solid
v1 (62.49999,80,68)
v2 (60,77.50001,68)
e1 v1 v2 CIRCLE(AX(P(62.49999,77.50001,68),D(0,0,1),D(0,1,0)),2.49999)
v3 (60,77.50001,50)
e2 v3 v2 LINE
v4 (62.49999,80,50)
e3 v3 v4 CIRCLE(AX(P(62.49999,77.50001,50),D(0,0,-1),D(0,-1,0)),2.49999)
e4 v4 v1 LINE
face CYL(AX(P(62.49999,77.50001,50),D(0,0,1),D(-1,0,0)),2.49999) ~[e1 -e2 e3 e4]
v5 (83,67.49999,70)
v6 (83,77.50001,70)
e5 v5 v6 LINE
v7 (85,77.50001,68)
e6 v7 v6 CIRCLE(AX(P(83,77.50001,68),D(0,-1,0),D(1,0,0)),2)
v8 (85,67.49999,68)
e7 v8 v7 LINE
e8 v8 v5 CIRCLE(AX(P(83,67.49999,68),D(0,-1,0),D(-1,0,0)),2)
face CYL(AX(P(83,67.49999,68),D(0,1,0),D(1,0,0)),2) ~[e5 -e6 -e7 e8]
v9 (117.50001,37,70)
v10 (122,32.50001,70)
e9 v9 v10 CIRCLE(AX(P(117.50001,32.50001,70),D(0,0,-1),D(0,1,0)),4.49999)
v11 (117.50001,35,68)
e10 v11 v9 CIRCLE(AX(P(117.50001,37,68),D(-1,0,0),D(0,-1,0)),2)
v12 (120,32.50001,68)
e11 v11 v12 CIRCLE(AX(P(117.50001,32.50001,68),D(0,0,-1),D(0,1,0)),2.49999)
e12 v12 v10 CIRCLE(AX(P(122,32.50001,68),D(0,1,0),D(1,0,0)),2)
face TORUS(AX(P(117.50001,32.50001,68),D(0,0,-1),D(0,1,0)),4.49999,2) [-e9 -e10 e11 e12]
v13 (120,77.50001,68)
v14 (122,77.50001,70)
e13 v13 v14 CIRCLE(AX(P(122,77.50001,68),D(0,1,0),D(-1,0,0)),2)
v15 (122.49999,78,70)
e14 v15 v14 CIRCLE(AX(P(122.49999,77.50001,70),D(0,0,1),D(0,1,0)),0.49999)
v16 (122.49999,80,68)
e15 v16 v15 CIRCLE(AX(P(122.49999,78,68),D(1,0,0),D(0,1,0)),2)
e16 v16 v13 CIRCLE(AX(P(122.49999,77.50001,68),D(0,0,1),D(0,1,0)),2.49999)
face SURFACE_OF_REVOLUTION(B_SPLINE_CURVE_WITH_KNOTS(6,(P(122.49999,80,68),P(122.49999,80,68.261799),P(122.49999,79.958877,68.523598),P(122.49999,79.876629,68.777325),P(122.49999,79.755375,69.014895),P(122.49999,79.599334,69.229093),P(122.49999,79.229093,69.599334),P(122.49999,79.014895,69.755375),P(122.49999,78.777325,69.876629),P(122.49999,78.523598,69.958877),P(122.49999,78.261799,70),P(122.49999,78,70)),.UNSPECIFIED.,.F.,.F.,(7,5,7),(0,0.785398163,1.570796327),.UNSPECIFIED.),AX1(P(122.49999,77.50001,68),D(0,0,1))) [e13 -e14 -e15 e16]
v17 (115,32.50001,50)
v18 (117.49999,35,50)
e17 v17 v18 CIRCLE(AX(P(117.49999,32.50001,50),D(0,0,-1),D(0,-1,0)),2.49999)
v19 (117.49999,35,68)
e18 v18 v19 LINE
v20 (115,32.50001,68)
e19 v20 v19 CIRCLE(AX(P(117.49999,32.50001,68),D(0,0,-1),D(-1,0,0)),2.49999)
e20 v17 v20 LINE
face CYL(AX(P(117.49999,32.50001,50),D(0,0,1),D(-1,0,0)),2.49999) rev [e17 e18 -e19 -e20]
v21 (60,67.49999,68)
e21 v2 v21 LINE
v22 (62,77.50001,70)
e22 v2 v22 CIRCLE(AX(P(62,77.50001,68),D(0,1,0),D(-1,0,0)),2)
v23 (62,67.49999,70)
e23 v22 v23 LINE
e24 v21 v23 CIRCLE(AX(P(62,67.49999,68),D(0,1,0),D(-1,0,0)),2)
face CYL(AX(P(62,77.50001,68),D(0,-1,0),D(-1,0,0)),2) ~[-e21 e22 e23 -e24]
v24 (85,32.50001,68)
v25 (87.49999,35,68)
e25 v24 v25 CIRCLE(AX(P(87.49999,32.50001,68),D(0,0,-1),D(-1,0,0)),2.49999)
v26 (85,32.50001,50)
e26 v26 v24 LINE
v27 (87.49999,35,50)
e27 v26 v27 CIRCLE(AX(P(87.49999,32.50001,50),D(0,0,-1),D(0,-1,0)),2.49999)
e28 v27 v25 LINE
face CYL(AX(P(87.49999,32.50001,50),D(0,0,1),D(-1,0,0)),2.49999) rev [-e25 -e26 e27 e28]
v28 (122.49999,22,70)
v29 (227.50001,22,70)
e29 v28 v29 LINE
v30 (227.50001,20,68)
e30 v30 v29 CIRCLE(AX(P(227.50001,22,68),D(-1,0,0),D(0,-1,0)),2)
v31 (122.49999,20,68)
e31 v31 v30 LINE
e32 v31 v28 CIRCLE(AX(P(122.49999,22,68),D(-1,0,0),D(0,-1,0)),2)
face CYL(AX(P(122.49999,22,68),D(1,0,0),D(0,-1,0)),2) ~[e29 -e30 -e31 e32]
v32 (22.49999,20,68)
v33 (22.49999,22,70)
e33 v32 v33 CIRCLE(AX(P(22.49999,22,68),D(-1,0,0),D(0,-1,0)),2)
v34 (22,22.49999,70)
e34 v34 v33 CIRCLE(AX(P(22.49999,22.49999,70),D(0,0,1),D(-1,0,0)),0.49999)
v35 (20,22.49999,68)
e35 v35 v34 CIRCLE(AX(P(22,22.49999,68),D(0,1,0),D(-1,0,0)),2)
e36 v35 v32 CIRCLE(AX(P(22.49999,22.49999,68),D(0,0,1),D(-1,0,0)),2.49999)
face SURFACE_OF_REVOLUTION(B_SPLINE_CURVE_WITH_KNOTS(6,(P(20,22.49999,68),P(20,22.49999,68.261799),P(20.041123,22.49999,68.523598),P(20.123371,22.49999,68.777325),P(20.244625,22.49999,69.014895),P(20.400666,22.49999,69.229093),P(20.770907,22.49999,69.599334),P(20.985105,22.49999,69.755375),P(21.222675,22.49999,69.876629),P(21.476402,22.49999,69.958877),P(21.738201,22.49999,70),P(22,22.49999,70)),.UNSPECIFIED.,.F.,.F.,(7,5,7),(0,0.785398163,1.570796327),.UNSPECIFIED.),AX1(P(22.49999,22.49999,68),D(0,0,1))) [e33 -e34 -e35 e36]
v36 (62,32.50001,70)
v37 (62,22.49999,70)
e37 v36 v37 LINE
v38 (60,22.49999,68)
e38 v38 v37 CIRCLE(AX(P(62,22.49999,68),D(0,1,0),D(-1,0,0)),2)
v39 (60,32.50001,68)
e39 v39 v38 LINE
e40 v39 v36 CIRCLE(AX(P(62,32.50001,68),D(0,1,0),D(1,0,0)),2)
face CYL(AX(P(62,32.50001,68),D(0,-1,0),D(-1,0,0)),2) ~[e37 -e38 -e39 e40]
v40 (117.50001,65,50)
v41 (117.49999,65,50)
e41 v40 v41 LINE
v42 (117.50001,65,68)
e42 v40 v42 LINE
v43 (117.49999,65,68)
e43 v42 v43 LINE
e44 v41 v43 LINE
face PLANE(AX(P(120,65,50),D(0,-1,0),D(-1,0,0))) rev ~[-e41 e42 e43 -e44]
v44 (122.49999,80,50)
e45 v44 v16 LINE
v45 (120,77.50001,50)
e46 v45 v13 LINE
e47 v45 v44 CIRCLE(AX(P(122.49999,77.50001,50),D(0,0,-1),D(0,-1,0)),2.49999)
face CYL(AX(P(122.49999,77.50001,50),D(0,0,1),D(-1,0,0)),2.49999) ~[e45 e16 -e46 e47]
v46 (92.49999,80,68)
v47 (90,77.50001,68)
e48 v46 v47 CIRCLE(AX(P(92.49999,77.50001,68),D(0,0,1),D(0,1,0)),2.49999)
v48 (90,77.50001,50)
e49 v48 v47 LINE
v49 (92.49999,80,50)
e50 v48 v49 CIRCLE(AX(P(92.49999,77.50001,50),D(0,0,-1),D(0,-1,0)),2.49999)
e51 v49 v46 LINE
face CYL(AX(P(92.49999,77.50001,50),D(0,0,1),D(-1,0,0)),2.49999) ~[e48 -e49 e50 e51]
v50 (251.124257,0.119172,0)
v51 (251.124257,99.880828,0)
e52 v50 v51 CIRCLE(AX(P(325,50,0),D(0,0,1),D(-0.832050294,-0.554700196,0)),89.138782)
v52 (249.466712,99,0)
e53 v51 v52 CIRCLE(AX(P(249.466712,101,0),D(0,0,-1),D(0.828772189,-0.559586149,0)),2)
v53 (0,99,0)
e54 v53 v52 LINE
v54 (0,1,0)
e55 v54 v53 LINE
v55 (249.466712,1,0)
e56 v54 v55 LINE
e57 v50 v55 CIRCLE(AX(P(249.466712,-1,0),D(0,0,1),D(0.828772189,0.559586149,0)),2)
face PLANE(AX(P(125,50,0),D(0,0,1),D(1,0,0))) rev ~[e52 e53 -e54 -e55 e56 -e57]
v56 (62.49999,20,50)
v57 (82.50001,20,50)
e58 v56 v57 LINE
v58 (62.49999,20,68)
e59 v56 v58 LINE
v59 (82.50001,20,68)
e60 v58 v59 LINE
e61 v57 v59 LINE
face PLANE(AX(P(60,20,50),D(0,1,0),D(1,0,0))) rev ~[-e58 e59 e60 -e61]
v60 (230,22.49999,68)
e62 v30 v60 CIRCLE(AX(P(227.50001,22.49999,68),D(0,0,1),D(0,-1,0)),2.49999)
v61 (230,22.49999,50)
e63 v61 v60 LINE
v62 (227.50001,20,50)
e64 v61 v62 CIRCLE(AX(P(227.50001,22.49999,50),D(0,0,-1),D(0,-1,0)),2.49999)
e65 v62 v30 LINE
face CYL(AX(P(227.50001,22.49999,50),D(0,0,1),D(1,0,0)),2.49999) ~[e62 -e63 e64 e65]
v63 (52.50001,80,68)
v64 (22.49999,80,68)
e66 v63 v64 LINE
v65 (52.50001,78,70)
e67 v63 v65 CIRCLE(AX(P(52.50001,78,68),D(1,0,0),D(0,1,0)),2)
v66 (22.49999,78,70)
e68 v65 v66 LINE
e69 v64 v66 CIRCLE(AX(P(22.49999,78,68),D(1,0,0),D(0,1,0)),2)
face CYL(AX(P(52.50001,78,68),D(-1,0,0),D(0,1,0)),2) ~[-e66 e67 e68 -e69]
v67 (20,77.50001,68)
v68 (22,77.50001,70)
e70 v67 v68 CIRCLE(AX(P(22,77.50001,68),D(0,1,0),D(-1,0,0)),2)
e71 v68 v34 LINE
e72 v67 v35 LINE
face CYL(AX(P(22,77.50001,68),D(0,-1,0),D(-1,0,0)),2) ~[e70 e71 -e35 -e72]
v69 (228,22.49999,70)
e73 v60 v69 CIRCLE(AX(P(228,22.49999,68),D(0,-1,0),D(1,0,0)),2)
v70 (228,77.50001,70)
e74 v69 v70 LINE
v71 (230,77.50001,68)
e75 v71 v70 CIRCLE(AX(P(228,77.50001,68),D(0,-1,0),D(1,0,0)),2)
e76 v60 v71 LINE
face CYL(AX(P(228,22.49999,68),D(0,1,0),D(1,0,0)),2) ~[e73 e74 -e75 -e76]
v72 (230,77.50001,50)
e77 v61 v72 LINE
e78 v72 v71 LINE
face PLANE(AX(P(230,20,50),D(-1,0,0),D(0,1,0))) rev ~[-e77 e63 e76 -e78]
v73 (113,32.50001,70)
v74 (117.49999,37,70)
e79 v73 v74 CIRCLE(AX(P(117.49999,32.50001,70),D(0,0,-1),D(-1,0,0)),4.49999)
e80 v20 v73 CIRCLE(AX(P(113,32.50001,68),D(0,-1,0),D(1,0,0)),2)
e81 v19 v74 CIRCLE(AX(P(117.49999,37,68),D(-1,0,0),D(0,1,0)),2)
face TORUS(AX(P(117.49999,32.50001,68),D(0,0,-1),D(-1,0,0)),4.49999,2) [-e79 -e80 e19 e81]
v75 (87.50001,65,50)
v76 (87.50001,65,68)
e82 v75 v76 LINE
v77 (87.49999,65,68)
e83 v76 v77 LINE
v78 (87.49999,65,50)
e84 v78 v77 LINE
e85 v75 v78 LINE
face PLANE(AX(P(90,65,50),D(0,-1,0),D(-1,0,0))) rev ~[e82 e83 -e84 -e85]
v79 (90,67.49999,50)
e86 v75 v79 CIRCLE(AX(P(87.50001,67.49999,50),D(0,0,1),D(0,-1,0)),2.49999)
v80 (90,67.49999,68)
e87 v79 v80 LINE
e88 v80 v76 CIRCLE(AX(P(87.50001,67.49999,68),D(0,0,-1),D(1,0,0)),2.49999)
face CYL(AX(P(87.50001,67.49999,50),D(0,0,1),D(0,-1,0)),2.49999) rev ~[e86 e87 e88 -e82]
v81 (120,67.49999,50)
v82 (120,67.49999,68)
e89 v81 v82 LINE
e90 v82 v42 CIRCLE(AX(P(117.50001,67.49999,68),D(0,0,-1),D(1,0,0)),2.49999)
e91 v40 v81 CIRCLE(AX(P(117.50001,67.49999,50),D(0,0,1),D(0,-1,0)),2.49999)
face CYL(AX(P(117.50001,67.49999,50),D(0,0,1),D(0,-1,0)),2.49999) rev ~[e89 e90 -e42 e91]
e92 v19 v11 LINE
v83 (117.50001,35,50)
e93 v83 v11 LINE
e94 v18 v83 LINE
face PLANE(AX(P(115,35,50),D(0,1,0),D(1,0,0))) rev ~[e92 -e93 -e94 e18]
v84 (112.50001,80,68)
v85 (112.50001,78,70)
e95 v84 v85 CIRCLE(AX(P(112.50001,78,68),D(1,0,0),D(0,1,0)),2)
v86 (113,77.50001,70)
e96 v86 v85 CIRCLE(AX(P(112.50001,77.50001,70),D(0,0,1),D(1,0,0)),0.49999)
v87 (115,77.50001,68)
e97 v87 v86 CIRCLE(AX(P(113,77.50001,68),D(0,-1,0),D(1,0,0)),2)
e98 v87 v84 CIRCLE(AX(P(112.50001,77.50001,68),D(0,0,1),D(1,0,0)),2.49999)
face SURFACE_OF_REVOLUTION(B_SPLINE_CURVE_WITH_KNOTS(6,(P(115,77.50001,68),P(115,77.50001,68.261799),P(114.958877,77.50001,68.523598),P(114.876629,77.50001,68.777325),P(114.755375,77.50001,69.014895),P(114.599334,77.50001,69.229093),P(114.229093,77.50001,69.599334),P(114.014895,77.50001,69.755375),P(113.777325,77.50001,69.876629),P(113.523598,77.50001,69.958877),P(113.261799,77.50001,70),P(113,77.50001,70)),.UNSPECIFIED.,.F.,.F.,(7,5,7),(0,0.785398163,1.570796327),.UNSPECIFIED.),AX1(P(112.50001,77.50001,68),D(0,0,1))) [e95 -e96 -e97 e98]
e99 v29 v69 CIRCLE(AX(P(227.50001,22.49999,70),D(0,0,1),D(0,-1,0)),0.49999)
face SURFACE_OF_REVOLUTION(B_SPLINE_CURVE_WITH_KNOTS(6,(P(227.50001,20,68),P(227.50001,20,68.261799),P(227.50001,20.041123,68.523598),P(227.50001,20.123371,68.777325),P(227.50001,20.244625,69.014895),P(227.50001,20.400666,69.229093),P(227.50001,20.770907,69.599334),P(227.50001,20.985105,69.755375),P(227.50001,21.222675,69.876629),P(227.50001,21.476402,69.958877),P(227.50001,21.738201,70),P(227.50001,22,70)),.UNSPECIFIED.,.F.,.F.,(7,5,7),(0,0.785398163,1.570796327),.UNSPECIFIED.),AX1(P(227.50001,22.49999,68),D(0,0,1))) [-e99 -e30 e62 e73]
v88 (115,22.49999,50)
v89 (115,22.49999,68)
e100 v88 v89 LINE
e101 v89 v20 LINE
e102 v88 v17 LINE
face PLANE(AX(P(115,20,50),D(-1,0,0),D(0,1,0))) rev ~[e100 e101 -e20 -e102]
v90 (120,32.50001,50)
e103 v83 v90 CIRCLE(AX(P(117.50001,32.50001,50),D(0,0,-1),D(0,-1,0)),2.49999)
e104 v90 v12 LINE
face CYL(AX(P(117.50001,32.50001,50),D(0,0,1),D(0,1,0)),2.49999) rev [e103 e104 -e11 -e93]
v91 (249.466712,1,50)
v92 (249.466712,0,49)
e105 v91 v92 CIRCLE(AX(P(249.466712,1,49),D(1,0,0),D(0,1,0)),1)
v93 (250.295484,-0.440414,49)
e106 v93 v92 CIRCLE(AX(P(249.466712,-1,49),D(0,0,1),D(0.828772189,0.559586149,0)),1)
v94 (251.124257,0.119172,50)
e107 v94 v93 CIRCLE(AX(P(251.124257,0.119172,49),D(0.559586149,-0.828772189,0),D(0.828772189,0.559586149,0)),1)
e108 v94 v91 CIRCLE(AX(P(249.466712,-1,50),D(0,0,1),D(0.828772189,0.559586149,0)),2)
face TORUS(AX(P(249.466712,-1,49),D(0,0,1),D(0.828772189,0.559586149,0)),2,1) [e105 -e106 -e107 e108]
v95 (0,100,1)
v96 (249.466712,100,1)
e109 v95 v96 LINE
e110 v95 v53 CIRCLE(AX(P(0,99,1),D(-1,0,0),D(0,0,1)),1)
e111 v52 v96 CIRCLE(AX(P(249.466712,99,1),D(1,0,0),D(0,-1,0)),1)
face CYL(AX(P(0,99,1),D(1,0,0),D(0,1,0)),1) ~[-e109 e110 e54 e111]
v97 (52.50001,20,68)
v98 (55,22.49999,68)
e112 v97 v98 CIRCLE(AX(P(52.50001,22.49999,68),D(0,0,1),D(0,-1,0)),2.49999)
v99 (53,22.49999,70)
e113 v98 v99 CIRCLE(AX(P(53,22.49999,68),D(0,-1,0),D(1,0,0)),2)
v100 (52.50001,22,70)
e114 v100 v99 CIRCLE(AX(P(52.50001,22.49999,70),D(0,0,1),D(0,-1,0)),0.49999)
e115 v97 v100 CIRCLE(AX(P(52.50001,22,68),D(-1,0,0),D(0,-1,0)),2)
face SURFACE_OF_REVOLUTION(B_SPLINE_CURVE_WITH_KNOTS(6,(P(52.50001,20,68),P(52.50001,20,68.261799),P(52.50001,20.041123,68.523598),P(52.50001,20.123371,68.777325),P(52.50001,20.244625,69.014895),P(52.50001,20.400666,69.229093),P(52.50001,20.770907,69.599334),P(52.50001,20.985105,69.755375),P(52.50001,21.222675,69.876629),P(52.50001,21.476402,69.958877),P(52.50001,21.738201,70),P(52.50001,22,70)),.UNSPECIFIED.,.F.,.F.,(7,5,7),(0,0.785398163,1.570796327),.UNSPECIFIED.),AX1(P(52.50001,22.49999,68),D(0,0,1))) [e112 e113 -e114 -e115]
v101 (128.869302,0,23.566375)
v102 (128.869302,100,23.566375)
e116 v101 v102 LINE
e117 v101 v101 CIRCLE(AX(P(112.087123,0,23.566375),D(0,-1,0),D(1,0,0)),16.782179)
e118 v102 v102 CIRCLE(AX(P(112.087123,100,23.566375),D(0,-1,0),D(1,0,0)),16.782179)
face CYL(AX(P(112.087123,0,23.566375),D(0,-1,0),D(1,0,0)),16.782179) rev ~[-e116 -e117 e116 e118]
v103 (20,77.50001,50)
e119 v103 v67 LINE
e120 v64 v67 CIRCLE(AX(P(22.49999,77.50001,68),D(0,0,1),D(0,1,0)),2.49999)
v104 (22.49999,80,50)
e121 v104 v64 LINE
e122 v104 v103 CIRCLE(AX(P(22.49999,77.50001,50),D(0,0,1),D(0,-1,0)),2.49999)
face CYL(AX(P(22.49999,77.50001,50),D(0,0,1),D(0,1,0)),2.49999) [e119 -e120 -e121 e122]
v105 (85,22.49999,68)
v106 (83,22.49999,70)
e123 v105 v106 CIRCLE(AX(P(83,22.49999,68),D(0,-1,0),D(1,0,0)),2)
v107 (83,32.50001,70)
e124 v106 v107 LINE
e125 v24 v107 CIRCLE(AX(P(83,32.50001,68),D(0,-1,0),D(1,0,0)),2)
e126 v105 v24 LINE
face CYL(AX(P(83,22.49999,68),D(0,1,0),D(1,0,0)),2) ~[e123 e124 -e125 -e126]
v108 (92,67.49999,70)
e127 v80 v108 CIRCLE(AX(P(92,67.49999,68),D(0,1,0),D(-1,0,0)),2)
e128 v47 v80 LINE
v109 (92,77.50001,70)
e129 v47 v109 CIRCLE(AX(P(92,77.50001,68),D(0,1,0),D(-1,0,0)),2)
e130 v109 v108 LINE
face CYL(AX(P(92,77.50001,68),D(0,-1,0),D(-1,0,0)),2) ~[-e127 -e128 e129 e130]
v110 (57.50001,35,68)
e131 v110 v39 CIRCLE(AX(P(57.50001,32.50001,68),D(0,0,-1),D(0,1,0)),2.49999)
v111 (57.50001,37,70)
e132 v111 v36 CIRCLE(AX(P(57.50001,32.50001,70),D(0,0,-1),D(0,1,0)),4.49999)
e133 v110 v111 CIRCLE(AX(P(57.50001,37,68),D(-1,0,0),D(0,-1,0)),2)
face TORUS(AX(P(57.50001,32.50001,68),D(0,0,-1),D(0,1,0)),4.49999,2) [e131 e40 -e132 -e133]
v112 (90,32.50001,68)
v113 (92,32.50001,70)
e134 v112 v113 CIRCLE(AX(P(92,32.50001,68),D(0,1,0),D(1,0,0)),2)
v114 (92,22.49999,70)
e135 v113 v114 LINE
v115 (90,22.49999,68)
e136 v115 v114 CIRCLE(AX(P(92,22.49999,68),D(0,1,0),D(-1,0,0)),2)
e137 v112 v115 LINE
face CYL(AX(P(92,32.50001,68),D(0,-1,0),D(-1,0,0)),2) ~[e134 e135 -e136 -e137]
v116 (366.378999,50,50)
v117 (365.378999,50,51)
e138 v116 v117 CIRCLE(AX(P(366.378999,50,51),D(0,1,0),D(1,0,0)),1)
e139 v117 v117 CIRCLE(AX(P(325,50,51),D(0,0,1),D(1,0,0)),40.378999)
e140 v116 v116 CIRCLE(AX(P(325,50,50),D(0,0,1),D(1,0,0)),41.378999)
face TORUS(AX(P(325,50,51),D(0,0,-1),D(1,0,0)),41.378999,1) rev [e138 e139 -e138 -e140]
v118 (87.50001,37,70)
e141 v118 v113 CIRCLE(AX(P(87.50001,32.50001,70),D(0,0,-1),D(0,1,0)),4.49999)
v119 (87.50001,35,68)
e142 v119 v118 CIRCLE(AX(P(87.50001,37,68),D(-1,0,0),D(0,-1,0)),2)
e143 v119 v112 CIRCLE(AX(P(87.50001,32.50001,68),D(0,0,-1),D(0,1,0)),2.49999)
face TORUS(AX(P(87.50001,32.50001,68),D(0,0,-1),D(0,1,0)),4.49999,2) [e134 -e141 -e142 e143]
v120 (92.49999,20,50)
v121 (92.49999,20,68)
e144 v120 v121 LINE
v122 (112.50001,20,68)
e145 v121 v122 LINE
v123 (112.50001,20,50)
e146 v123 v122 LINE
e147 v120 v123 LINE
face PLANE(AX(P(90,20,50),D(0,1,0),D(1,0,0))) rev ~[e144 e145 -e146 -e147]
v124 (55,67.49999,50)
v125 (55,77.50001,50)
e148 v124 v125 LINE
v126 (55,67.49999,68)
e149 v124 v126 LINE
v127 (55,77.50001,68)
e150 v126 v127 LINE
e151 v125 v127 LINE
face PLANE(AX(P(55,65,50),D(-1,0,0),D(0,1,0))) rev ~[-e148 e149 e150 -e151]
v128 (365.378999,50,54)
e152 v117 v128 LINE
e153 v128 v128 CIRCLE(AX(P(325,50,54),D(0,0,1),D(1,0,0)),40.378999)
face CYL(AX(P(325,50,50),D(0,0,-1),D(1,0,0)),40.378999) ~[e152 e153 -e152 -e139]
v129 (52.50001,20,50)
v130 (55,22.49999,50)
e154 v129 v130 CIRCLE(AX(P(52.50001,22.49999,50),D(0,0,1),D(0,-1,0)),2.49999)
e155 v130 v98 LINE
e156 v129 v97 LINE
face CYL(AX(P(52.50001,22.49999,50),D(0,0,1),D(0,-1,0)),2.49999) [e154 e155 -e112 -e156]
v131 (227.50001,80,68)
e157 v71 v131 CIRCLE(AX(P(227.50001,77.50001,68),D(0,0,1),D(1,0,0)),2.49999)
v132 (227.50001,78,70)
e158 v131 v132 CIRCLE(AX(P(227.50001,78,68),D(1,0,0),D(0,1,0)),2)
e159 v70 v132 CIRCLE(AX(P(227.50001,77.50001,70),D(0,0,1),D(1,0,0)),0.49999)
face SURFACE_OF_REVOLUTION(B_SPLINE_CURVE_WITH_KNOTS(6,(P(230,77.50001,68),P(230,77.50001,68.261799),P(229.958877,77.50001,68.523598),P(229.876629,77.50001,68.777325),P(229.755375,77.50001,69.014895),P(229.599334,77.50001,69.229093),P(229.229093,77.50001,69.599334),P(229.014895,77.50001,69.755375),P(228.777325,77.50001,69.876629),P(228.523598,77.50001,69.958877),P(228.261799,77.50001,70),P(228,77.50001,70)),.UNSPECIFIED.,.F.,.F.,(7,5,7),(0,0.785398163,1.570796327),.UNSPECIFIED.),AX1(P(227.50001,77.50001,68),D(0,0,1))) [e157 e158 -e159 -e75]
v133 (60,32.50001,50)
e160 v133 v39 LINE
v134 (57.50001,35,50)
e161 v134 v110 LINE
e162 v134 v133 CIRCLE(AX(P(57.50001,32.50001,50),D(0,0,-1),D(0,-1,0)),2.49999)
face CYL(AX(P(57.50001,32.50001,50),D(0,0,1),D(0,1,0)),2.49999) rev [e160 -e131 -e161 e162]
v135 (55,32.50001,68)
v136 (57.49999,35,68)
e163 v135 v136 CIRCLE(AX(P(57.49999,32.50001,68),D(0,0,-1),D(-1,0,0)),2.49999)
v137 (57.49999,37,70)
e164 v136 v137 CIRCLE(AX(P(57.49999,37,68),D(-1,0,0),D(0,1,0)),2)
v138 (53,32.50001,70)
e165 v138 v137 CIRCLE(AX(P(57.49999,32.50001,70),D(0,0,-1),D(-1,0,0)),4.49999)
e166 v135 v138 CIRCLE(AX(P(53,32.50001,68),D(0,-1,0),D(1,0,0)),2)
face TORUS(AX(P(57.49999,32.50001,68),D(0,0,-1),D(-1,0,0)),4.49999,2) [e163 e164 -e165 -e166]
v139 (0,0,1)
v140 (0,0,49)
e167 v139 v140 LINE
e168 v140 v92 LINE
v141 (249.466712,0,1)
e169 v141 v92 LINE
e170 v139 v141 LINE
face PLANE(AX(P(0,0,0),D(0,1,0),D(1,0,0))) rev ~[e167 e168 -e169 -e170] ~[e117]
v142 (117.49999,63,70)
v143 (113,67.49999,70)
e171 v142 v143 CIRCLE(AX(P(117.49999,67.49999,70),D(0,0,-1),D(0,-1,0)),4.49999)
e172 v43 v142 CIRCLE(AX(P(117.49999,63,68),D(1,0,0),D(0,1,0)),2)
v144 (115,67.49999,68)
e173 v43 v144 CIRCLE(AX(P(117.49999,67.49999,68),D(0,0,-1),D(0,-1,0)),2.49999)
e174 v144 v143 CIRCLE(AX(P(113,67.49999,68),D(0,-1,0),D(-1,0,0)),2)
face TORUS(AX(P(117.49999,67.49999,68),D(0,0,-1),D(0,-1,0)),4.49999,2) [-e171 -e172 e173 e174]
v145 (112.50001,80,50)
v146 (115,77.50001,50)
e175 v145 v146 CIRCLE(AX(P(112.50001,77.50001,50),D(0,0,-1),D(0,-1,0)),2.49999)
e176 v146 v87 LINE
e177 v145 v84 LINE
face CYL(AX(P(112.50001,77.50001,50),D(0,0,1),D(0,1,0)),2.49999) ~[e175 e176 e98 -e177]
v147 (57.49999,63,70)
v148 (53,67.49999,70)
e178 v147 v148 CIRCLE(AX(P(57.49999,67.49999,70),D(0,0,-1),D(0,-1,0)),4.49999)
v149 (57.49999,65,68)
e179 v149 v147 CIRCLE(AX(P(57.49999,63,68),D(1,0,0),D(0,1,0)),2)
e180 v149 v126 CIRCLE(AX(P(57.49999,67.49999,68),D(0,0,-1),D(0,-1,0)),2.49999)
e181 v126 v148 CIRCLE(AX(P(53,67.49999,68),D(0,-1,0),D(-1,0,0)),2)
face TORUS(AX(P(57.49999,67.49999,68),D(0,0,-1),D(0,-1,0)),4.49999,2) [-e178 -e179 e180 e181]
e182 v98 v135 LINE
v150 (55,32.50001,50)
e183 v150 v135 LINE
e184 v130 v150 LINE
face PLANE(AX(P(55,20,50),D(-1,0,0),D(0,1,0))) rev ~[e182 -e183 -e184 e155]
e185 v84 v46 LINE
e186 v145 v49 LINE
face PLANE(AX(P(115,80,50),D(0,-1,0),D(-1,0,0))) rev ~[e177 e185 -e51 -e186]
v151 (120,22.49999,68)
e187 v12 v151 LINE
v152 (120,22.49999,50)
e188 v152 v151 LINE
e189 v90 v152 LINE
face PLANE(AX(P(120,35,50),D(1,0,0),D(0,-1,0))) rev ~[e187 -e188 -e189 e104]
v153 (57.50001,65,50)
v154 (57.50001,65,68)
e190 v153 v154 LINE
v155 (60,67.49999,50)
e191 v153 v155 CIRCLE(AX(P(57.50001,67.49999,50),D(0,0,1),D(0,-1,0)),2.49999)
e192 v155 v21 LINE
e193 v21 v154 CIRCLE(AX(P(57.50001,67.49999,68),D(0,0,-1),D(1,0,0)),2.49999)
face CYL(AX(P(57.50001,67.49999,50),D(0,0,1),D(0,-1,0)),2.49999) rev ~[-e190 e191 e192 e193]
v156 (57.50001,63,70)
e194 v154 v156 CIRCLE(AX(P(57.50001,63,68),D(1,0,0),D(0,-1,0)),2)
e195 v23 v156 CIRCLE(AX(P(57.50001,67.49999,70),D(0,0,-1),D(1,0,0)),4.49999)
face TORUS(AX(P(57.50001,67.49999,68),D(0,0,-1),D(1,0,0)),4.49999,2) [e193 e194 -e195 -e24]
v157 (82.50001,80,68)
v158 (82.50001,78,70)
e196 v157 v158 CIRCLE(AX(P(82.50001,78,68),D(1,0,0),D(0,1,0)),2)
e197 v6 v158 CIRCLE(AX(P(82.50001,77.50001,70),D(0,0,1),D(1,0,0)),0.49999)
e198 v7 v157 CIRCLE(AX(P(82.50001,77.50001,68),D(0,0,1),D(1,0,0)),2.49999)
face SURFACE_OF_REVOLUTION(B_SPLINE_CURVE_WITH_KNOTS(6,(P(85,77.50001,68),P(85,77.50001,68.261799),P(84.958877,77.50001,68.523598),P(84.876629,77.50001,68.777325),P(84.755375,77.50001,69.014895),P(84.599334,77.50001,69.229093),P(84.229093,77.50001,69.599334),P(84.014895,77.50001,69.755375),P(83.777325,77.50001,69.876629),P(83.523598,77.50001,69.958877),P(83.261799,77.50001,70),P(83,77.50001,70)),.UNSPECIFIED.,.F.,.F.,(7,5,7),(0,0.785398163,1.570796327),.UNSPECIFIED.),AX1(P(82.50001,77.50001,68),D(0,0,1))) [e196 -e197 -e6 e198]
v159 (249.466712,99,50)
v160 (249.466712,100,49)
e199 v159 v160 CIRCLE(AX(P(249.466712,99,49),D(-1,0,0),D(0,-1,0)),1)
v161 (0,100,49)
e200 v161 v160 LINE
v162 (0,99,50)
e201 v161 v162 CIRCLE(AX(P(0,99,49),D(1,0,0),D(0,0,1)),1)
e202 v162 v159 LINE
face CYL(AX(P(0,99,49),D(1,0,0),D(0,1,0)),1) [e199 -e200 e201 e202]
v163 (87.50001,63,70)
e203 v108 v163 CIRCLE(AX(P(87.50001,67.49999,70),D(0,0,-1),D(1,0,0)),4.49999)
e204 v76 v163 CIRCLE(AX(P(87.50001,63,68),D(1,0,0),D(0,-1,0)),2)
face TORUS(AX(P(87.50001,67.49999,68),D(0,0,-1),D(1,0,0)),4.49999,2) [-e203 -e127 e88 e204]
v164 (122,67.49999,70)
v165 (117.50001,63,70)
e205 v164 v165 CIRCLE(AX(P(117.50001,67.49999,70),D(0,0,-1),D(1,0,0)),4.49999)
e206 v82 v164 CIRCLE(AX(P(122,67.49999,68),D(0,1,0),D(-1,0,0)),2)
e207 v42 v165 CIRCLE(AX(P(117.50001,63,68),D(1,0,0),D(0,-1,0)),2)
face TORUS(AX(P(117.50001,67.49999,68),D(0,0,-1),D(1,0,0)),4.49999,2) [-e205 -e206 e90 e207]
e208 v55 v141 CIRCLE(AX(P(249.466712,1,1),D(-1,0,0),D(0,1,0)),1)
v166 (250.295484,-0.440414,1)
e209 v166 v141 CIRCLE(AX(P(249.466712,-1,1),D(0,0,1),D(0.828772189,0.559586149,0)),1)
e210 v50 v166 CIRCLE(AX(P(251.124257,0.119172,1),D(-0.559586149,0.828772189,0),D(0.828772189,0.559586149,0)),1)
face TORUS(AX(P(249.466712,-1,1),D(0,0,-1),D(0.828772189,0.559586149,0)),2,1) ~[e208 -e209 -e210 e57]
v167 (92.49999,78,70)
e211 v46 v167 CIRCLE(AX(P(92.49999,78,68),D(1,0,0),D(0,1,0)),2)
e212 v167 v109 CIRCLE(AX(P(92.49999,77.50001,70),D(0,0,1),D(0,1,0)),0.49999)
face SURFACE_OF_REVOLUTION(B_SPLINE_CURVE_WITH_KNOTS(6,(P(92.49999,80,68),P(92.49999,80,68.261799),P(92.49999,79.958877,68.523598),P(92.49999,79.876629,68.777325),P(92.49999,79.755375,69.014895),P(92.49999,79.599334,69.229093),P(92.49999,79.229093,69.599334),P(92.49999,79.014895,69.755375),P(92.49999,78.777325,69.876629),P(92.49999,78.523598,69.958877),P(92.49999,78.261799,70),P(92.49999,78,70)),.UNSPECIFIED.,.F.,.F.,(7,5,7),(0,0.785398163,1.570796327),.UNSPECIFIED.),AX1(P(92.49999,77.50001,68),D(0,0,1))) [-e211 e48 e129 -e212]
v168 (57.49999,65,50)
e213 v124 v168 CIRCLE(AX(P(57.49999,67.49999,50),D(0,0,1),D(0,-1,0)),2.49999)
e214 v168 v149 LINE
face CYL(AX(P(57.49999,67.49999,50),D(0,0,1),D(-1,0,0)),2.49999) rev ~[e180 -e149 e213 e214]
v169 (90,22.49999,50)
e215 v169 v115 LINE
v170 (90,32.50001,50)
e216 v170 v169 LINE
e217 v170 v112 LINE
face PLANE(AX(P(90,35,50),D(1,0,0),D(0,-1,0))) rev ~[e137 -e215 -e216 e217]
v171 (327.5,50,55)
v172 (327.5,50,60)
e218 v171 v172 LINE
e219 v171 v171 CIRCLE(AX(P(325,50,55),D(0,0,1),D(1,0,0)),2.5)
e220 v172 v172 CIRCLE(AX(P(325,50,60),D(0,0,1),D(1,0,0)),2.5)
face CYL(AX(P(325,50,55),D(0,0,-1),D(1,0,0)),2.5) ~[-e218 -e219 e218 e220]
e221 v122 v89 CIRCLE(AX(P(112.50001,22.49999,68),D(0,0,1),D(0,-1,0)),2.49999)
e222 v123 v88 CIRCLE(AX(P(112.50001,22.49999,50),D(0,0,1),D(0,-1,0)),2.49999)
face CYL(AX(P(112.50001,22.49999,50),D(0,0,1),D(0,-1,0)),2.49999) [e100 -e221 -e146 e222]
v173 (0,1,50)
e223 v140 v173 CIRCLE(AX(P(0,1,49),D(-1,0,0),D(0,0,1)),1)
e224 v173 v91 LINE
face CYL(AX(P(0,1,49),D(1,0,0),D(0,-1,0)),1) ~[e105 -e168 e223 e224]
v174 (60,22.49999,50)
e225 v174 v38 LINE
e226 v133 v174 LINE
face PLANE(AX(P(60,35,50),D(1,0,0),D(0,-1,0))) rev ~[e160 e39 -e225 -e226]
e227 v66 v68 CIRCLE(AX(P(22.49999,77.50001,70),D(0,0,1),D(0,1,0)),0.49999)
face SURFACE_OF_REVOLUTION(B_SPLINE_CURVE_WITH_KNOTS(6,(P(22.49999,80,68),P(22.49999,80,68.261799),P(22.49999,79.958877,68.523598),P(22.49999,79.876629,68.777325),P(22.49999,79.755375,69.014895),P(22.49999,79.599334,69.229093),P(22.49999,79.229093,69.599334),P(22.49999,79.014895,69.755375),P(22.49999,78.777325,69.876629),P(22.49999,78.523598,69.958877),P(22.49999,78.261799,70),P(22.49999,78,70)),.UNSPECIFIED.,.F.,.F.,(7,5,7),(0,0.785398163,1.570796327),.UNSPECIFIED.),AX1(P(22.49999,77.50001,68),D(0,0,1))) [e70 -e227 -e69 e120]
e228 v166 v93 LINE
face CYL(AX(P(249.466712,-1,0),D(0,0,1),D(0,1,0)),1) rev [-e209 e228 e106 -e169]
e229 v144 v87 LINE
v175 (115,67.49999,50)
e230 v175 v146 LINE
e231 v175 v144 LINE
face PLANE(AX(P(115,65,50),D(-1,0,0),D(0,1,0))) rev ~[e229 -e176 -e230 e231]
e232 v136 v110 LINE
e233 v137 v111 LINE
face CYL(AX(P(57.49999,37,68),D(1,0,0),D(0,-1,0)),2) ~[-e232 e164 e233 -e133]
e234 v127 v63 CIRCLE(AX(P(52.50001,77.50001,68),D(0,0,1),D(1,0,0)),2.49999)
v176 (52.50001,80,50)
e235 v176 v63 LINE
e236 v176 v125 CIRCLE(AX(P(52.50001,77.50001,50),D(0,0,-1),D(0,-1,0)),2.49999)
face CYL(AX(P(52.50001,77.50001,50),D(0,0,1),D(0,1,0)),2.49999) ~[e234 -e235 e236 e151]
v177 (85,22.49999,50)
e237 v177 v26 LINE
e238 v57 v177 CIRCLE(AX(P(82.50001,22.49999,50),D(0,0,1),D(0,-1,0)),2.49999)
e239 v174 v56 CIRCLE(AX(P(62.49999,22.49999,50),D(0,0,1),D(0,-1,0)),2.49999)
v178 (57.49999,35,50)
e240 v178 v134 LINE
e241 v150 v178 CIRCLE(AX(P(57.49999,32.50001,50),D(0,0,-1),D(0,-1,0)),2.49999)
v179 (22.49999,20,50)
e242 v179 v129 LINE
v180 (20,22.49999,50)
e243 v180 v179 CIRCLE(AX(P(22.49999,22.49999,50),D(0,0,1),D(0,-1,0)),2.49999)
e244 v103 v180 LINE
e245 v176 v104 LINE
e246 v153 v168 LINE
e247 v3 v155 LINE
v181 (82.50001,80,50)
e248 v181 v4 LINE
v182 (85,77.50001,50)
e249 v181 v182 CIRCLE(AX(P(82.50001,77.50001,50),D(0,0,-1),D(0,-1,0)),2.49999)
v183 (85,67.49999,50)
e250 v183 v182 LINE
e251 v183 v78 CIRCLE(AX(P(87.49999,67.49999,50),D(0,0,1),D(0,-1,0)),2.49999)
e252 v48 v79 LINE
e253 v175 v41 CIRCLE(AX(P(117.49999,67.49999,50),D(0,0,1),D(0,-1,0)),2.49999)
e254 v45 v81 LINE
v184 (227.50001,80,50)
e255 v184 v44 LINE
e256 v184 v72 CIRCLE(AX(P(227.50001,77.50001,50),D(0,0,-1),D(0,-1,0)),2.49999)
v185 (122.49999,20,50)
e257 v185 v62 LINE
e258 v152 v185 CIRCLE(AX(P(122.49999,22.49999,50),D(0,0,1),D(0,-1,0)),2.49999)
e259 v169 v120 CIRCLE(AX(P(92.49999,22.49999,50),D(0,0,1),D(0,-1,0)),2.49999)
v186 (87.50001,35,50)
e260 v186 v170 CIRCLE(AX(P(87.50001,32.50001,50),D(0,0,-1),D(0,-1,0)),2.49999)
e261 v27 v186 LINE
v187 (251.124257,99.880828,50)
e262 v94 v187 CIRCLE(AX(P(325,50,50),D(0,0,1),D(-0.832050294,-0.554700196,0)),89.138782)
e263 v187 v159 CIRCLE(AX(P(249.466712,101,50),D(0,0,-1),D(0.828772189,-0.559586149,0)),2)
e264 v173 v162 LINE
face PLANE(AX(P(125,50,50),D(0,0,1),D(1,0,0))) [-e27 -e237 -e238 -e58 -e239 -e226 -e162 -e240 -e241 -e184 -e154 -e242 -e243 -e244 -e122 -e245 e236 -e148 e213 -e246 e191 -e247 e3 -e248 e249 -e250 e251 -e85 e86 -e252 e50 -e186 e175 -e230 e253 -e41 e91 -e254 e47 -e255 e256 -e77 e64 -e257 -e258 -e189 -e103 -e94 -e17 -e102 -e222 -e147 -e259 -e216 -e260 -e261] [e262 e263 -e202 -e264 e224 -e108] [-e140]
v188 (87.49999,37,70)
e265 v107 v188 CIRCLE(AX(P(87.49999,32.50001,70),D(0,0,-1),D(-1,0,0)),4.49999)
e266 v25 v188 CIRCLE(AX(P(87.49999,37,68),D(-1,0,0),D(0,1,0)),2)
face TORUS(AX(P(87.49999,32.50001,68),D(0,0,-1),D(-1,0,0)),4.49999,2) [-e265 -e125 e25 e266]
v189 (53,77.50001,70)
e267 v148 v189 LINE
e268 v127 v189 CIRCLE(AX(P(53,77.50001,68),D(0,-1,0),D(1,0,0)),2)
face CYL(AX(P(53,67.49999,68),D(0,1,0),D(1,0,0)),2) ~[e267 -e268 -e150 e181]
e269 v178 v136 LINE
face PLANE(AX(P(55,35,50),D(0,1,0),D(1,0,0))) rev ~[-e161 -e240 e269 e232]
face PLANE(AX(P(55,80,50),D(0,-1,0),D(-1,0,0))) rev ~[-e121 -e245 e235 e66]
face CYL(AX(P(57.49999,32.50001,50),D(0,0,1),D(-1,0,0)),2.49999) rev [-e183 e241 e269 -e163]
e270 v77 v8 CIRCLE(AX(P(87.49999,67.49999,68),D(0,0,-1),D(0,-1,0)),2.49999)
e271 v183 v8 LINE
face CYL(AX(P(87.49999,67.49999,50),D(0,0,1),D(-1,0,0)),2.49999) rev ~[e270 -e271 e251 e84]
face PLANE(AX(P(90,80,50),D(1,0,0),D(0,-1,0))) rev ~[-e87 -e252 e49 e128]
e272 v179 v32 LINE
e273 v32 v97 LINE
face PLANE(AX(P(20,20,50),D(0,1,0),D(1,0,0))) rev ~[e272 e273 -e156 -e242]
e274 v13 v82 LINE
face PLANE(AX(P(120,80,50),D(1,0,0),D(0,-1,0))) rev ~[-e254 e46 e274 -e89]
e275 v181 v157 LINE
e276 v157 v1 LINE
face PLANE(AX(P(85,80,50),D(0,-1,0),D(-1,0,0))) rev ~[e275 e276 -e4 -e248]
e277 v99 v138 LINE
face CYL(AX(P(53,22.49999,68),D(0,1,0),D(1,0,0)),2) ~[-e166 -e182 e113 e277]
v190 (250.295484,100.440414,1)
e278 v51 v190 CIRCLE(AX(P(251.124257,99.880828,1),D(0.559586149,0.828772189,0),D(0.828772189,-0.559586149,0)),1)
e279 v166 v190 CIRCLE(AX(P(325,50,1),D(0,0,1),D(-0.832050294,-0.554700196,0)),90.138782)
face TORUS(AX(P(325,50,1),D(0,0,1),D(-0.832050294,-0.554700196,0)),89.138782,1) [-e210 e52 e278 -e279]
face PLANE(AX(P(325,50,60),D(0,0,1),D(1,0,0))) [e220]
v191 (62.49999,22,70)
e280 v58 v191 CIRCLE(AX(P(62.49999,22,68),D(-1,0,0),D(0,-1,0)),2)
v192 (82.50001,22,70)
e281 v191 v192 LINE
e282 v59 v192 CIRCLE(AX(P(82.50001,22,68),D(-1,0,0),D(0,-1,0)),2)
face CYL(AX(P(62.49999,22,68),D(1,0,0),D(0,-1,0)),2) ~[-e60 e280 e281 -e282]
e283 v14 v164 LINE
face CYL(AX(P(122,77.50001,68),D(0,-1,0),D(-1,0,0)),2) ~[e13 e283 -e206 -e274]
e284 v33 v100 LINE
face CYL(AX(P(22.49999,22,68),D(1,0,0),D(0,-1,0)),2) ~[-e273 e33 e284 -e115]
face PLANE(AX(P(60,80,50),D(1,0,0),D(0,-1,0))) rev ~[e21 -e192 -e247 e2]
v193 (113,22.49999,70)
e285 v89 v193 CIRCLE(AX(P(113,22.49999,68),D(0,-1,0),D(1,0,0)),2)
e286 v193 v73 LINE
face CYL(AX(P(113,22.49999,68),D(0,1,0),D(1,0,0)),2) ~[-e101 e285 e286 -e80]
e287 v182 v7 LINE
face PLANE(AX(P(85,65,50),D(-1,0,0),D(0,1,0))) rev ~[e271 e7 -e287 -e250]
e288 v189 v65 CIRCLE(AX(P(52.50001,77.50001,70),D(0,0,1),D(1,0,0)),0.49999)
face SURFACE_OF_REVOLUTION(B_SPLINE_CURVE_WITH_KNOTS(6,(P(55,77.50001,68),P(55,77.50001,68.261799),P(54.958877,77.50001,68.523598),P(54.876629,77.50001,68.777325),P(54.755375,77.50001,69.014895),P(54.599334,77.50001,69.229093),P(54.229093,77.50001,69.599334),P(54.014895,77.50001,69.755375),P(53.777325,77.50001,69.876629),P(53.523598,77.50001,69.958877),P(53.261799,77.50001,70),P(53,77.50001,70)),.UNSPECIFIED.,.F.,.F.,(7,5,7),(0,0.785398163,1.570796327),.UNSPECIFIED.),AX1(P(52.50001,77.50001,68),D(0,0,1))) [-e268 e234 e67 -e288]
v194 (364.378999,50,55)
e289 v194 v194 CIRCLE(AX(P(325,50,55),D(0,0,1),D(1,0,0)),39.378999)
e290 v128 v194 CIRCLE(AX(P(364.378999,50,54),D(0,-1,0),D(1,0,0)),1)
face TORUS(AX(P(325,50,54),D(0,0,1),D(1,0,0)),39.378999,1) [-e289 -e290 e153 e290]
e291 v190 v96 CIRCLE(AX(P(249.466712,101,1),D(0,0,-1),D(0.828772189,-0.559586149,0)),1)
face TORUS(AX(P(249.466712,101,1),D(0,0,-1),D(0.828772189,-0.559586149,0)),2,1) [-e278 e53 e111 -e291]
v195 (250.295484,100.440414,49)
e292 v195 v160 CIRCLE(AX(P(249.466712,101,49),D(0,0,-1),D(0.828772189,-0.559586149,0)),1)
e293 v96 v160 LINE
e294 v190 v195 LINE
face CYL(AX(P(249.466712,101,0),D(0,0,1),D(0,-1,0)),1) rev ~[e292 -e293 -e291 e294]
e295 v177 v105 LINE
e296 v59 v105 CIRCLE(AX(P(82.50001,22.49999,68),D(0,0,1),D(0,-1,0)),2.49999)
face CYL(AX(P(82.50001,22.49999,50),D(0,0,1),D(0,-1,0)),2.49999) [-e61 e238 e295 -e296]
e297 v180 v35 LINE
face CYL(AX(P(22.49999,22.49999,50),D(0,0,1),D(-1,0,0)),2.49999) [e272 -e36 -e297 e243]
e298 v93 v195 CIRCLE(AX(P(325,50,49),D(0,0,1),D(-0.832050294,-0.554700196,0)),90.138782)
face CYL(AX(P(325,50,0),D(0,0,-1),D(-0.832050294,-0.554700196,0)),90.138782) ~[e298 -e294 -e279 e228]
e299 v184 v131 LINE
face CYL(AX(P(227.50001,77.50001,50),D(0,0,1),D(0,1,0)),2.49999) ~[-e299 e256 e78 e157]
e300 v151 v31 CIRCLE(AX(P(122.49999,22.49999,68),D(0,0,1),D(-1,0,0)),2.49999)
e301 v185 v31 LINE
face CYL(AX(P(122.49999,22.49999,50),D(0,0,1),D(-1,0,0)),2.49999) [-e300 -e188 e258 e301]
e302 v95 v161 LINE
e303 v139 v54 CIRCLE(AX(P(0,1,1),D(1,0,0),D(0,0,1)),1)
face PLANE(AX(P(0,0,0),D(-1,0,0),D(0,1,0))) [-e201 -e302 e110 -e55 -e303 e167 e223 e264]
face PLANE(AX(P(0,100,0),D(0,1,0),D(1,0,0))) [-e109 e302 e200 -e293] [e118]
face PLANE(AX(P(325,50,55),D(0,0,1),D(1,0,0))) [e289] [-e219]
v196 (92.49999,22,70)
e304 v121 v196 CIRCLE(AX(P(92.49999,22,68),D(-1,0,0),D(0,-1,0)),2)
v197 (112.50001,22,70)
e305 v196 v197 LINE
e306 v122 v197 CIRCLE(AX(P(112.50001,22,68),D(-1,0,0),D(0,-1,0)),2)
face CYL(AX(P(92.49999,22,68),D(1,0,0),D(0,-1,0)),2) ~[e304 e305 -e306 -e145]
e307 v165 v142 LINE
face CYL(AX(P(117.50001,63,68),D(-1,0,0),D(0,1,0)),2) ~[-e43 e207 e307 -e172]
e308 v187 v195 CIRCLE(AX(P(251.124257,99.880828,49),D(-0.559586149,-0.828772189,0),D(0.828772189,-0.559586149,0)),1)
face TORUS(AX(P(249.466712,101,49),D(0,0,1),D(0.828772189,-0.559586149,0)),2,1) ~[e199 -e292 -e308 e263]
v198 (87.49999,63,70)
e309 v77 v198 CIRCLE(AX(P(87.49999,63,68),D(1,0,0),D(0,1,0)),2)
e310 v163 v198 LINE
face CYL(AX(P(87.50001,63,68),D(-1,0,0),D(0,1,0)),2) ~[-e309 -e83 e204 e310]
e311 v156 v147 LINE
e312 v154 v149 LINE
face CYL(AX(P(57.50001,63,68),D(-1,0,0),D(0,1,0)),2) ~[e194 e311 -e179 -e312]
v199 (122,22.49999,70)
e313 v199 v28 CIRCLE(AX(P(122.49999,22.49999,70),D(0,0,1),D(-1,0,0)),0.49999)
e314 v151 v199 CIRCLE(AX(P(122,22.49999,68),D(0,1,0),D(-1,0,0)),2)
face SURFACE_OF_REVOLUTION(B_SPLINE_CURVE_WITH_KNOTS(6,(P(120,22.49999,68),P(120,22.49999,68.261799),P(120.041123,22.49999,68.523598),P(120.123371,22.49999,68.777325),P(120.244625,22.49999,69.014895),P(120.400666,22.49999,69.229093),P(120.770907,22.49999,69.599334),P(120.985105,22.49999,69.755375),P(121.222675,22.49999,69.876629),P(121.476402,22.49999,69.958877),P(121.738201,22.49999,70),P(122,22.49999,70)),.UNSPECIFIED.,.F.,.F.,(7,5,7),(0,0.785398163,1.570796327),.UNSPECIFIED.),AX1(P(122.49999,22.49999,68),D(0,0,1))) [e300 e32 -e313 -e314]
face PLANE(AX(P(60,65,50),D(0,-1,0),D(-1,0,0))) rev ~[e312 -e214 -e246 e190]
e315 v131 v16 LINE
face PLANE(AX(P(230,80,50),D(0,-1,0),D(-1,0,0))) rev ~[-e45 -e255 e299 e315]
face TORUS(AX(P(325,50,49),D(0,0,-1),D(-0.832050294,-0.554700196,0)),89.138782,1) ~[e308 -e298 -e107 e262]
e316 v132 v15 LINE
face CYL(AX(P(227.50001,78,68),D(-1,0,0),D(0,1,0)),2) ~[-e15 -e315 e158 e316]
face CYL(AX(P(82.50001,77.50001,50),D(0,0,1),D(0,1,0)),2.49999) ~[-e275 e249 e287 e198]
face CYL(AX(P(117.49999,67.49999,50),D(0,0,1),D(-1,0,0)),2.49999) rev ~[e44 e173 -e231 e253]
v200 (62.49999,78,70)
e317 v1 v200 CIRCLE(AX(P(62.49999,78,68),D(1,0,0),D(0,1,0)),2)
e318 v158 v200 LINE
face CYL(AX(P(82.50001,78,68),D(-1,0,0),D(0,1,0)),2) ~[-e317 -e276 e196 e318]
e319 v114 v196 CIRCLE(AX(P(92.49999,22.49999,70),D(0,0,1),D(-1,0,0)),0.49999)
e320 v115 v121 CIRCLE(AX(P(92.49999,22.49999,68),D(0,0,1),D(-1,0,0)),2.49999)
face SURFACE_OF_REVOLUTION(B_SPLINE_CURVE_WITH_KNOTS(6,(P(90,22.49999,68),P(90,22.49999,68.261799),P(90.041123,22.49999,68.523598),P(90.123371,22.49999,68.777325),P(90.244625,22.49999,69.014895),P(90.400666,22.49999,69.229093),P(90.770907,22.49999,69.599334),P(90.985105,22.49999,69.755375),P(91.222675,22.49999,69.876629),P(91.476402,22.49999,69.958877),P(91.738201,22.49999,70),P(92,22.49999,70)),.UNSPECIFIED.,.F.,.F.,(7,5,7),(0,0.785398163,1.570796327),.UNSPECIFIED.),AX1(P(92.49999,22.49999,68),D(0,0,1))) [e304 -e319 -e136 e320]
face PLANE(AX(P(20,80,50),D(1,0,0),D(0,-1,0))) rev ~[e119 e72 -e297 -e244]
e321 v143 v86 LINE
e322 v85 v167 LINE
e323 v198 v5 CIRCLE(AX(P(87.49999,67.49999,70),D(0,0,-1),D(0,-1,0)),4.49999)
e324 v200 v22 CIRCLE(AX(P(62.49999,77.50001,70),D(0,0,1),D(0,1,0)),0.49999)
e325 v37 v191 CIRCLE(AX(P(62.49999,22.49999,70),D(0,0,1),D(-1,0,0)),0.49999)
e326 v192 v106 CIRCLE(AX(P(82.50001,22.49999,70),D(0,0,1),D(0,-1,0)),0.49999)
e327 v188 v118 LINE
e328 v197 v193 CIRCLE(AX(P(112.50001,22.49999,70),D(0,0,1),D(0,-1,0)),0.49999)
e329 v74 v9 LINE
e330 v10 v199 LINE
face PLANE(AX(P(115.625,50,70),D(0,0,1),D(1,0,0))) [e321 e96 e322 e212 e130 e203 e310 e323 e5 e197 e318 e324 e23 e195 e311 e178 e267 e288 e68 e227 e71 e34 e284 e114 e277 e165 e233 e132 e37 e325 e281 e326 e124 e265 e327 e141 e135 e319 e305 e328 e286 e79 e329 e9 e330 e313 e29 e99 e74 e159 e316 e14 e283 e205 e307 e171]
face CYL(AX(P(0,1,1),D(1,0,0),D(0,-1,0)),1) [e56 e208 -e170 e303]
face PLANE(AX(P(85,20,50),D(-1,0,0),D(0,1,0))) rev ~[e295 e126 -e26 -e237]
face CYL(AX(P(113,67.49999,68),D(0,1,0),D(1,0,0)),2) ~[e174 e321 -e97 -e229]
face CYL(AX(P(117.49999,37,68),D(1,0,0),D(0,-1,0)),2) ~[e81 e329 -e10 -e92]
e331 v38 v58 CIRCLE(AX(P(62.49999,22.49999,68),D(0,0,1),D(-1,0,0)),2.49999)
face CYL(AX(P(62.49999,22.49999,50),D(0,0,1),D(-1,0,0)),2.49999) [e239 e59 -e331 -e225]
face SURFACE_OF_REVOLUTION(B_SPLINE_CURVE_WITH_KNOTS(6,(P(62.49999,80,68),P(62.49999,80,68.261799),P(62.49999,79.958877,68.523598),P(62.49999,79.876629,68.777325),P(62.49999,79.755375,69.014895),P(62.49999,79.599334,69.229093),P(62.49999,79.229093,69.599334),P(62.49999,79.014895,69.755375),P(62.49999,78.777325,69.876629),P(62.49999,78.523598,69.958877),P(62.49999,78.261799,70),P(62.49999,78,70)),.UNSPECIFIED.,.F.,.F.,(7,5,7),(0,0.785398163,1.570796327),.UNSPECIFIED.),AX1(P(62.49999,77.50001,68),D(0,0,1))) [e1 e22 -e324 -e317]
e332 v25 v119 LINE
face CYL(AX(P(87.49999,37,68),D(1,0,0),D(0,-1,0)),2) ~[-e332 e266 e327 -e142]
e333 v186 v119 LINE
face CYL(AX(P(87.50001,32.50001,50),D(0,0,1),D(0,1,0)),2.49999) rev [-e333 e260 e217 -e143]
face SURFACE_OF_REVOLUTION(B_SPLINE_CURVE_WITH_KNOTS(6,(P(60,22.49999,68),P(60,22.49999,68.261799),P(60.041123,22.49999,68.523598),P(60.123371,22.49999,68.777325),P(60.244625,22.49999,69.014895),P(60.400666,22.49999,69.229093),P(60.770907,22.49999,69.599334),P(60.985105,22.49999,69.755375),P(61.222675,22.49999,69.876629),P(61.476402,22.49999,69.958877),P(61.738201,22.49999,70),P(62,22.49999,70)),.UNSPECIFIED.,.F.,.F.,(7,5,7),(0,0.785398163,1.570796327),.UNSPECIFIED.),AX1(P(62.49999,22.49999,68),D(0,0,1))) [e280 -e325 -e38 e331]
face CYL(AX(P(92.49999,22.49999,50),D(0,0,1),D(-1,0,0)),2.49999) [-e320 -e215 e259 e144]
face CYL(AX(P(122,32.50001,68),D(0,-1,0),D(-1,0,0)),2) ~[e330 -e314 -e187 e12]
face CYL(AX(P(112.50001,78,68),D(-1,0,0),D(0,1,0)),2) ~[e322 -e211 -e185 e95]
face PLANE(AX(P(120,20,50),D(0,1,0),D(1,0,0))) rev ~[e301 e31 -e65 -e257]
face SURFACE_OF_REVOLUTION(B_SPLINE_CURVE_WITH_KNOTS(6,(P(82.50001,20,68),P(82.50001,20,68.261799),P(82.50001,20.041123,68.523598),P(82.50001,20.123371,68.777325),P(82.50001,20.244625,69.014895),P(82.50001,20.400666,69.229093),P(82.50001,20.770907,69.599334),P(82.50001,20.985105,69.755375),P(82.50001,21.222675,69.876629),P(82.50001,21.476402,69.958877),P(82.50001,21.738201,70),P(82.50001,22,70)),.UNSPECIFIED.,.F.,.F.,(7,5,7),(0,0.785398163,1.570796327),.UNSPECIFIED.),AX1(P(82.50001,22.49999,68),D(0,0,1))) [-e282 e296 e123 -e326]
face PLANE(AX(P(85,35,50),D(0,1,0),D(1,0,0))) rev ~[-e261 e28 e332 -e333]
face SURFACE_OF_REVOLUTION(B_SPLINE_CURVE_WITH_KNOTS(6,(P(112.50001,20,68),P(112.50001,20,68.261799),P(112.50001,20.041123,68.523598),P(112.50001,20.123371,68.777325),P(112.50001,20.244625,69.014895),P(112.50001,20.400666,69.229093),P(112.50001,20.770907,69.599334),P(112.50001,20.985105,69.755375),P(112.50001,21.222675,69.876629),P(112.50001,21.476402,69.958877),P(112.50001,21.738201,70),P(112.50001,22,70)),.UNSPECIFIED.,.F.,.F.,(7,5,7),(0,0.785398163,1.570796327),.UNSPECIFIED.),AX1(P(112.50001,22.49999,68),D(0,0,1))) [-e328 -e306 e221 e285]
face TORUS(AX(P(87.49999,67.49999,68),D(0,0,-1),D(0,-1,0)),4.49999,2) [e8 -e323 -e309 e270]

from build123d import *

# Parameters (mm, degrees)
F0_W      = 250
F0_H      = 100
F1_DEPTH  = 50
F3_DEPTH  = 20
F4_R      = 40.3789988007
F5_DEPTH  = 5
F6_R      = 2.5
F7_DEPTH  = 5
F8_R      = 1
F9_R      = 2.49999
F10_R     = 2
F11_R     = 16.7821791649
F12_DEPTH = 140.1397819866


# Not quite as in the source:
# - a fillet or chamfer is up to 0.001 mm smaller than in the source, because OpenCascade refuses the exact size


with BuildPart() as f1:
    # F0 (on Top) → F1 (new body)
    with BuildSketch(Plane.XY):
        with Locations((125, 50)):
            Rectangle(F0_W, F0_H)
        with BuildLine():
            Line((250, 100), (250, 0))
            ThreePointArc((250, 0), (415.1387818866, 50), (250, 100))
        make_face()
    extrude(amount=F1_DEPTH)

    # F2 (on face) → F3 (join)
    with BuildSketch(Plane.XY.offset(50)):
        Polygon((55, 80), (20, 80), (20, 20), (55, 20), (55, 35), (60, 35), (60, 20), (85, 20), (85, 35), (90, 35), (90, 20), (115, 20), (115, 35), (120, 35), (120, 20), (230, 20), (230, 80), (120, 80), (120, 65), (115, 65), (115, 80), (90, 80), (90, 65), (85, 65), (85, 80), (60, 80), (60, 65), (55, 65), align=None)
    extrude(amount=F3_DEPTH)

    # F4 (on face) → F5 (join)
    with BuildSketch(Plane.XY.offset(50)):
        with Locations((325, 50)):
            Circle(F4_R)
    extrude(amount=F5_DEPTH)

    # F6 (on face) → F7 (join)
    with BuildSketch(Plane.XY.offset(55)):
        with Locations((325, 50)):
            Circle(F6_R)
    extrude(amount=F7_DEPTH)

    # F8
    f8_edges = [f1.edges().sort_by_distance(p)[0] for p in [
        (250, 0, 25),
        (250, 100, 25),
        (415.138782, 50, 0),
        (415.138782, 50, 50),
        (284.621001, 50, 55),
        (284.621001, 50, 50),
        (125, 100, 0),
        (125, 100, 50),
        (125, 0, 0),
        (125, 0, 50),
    ]]
    fillet(f8_edges, radius=F8_R)

    # F9 (radius 2.5 in the source; OpenCascade refuses exactly that, so slightly less here)
    f9_edges = [f1.edges().sort_by_distance(p)[0] for p in [
        (55, 35, 60),
        (55, 20, 60),
        (60, 35, 60),
        (60, 20, 60),
        (85, 20, 60),
        (90, 35, 60),
        (90, 20, 60),
        (115, 20, 60),
        (120, 35, 60),
        (120, 20, 60),
        (85, 35, 60),
        (115, 35, 60),
        (55, 65, 60),
        (55, 80, 60),
        (85, 65, 60),
        (85, 80, 60),
        (115, 65, 60),
        (115, 80, 60),
        (60, 65, 60),
        (60, 80, 60),
        (90, 65, 60),
        (90, 80, 60),
        (120, 65, 60),
        (120, 80, 60),
        (20, 80, 60),
        (20, 20, 60),
        (230, 80, 60),
        (230, 20, 60),
    ]]
    fillet(f9_edges, radius=F9_R)

    # F10
    f10_edges = [f1.edges().sort_by_distance(p)[0] for p in [
        (175, 80, 70),
        (230, 50, 70),
        (37.5, 80, 70),
        (54.26777, 79.26777, 70),
        (20.73223, 79.26777, 70),
        (55, 72.5, 70),
        (20, 50, 70),
        (55.73223, 65.73223, 70),
        (20.73223, 20.73223, 70),
        (57.5, 65, 70),
        (37.5, 20, 70),
        (59.26777, 65.73223, 70),
        (54.26777, 20.73223, 70),
        (60, 72.5, 70),
        (55, 27.5, 70),
        (60.73223, 79.26777, 70),
        (55.73223, 34.26777, 70),
        (72.5, 80, 70),
        (57.5, 35, 70),
        (84.26777, 79.26777, 70),
        (59.26777, 34.26777, 70),
        (85, 72.5, 70),
        (60, 27.5, 70),
        (85.73223, 65.73223, 70),
        (60.73223, 20.73223, 70),
        (87.5, 65, 70),
        (72.5, 20, 70),
        (89.26777, 65.73223, 70),
        (84.26777, 20.73223, 70),
        (90, 72.5, 70),
        (85, 27.5, 70),
        (90.73223, 79.26777, 70),
        (85.73223, 34.26777, 70),
        (102.5, 80, 70),
        (87.5, 35, 70),
        (114.26777, 79.26777, 70),
        (89.26777, 34.26777, 70),
        (115, 72.5, 70),
        (90, 27.5, 70),
        (115.73223, 65.73223, 70),
        (90.73223, 20.73223, 70),
        (117.5, 65, 70),
        (102.5, 20, 70),
        (119.26777, 65.73223, 70),
        (114.26777, 20.73223, 70),
        (120, 72.5, 70),
        (115, 27.5, 70),
        (120.73223, 79.26777, 70),
        (115.73223, 34.26777, 70),
        (117.5, 35, 70),
        (229.26777, 79.26777, 70),
        (119.26777, 34.26777, 70),
        (120, 27.5, 70),
        (229.26777, 20.73223, 70),
        (120.73223, 20.73223, 70),
        (175, 20, 70),
    ]]
    fillet(f10_edges, radius=F10_R)

    # F11 (on face) → F12 (cut, through all)
    with BuildSketch(Plane.XZ):
        with Locations((112.087123096, 23.5663745552)):
            Circle(F11_R)
    extrude(amount=-F12_DEPTH, mode=Mode.SUBTRACT)


solid = f1.part
